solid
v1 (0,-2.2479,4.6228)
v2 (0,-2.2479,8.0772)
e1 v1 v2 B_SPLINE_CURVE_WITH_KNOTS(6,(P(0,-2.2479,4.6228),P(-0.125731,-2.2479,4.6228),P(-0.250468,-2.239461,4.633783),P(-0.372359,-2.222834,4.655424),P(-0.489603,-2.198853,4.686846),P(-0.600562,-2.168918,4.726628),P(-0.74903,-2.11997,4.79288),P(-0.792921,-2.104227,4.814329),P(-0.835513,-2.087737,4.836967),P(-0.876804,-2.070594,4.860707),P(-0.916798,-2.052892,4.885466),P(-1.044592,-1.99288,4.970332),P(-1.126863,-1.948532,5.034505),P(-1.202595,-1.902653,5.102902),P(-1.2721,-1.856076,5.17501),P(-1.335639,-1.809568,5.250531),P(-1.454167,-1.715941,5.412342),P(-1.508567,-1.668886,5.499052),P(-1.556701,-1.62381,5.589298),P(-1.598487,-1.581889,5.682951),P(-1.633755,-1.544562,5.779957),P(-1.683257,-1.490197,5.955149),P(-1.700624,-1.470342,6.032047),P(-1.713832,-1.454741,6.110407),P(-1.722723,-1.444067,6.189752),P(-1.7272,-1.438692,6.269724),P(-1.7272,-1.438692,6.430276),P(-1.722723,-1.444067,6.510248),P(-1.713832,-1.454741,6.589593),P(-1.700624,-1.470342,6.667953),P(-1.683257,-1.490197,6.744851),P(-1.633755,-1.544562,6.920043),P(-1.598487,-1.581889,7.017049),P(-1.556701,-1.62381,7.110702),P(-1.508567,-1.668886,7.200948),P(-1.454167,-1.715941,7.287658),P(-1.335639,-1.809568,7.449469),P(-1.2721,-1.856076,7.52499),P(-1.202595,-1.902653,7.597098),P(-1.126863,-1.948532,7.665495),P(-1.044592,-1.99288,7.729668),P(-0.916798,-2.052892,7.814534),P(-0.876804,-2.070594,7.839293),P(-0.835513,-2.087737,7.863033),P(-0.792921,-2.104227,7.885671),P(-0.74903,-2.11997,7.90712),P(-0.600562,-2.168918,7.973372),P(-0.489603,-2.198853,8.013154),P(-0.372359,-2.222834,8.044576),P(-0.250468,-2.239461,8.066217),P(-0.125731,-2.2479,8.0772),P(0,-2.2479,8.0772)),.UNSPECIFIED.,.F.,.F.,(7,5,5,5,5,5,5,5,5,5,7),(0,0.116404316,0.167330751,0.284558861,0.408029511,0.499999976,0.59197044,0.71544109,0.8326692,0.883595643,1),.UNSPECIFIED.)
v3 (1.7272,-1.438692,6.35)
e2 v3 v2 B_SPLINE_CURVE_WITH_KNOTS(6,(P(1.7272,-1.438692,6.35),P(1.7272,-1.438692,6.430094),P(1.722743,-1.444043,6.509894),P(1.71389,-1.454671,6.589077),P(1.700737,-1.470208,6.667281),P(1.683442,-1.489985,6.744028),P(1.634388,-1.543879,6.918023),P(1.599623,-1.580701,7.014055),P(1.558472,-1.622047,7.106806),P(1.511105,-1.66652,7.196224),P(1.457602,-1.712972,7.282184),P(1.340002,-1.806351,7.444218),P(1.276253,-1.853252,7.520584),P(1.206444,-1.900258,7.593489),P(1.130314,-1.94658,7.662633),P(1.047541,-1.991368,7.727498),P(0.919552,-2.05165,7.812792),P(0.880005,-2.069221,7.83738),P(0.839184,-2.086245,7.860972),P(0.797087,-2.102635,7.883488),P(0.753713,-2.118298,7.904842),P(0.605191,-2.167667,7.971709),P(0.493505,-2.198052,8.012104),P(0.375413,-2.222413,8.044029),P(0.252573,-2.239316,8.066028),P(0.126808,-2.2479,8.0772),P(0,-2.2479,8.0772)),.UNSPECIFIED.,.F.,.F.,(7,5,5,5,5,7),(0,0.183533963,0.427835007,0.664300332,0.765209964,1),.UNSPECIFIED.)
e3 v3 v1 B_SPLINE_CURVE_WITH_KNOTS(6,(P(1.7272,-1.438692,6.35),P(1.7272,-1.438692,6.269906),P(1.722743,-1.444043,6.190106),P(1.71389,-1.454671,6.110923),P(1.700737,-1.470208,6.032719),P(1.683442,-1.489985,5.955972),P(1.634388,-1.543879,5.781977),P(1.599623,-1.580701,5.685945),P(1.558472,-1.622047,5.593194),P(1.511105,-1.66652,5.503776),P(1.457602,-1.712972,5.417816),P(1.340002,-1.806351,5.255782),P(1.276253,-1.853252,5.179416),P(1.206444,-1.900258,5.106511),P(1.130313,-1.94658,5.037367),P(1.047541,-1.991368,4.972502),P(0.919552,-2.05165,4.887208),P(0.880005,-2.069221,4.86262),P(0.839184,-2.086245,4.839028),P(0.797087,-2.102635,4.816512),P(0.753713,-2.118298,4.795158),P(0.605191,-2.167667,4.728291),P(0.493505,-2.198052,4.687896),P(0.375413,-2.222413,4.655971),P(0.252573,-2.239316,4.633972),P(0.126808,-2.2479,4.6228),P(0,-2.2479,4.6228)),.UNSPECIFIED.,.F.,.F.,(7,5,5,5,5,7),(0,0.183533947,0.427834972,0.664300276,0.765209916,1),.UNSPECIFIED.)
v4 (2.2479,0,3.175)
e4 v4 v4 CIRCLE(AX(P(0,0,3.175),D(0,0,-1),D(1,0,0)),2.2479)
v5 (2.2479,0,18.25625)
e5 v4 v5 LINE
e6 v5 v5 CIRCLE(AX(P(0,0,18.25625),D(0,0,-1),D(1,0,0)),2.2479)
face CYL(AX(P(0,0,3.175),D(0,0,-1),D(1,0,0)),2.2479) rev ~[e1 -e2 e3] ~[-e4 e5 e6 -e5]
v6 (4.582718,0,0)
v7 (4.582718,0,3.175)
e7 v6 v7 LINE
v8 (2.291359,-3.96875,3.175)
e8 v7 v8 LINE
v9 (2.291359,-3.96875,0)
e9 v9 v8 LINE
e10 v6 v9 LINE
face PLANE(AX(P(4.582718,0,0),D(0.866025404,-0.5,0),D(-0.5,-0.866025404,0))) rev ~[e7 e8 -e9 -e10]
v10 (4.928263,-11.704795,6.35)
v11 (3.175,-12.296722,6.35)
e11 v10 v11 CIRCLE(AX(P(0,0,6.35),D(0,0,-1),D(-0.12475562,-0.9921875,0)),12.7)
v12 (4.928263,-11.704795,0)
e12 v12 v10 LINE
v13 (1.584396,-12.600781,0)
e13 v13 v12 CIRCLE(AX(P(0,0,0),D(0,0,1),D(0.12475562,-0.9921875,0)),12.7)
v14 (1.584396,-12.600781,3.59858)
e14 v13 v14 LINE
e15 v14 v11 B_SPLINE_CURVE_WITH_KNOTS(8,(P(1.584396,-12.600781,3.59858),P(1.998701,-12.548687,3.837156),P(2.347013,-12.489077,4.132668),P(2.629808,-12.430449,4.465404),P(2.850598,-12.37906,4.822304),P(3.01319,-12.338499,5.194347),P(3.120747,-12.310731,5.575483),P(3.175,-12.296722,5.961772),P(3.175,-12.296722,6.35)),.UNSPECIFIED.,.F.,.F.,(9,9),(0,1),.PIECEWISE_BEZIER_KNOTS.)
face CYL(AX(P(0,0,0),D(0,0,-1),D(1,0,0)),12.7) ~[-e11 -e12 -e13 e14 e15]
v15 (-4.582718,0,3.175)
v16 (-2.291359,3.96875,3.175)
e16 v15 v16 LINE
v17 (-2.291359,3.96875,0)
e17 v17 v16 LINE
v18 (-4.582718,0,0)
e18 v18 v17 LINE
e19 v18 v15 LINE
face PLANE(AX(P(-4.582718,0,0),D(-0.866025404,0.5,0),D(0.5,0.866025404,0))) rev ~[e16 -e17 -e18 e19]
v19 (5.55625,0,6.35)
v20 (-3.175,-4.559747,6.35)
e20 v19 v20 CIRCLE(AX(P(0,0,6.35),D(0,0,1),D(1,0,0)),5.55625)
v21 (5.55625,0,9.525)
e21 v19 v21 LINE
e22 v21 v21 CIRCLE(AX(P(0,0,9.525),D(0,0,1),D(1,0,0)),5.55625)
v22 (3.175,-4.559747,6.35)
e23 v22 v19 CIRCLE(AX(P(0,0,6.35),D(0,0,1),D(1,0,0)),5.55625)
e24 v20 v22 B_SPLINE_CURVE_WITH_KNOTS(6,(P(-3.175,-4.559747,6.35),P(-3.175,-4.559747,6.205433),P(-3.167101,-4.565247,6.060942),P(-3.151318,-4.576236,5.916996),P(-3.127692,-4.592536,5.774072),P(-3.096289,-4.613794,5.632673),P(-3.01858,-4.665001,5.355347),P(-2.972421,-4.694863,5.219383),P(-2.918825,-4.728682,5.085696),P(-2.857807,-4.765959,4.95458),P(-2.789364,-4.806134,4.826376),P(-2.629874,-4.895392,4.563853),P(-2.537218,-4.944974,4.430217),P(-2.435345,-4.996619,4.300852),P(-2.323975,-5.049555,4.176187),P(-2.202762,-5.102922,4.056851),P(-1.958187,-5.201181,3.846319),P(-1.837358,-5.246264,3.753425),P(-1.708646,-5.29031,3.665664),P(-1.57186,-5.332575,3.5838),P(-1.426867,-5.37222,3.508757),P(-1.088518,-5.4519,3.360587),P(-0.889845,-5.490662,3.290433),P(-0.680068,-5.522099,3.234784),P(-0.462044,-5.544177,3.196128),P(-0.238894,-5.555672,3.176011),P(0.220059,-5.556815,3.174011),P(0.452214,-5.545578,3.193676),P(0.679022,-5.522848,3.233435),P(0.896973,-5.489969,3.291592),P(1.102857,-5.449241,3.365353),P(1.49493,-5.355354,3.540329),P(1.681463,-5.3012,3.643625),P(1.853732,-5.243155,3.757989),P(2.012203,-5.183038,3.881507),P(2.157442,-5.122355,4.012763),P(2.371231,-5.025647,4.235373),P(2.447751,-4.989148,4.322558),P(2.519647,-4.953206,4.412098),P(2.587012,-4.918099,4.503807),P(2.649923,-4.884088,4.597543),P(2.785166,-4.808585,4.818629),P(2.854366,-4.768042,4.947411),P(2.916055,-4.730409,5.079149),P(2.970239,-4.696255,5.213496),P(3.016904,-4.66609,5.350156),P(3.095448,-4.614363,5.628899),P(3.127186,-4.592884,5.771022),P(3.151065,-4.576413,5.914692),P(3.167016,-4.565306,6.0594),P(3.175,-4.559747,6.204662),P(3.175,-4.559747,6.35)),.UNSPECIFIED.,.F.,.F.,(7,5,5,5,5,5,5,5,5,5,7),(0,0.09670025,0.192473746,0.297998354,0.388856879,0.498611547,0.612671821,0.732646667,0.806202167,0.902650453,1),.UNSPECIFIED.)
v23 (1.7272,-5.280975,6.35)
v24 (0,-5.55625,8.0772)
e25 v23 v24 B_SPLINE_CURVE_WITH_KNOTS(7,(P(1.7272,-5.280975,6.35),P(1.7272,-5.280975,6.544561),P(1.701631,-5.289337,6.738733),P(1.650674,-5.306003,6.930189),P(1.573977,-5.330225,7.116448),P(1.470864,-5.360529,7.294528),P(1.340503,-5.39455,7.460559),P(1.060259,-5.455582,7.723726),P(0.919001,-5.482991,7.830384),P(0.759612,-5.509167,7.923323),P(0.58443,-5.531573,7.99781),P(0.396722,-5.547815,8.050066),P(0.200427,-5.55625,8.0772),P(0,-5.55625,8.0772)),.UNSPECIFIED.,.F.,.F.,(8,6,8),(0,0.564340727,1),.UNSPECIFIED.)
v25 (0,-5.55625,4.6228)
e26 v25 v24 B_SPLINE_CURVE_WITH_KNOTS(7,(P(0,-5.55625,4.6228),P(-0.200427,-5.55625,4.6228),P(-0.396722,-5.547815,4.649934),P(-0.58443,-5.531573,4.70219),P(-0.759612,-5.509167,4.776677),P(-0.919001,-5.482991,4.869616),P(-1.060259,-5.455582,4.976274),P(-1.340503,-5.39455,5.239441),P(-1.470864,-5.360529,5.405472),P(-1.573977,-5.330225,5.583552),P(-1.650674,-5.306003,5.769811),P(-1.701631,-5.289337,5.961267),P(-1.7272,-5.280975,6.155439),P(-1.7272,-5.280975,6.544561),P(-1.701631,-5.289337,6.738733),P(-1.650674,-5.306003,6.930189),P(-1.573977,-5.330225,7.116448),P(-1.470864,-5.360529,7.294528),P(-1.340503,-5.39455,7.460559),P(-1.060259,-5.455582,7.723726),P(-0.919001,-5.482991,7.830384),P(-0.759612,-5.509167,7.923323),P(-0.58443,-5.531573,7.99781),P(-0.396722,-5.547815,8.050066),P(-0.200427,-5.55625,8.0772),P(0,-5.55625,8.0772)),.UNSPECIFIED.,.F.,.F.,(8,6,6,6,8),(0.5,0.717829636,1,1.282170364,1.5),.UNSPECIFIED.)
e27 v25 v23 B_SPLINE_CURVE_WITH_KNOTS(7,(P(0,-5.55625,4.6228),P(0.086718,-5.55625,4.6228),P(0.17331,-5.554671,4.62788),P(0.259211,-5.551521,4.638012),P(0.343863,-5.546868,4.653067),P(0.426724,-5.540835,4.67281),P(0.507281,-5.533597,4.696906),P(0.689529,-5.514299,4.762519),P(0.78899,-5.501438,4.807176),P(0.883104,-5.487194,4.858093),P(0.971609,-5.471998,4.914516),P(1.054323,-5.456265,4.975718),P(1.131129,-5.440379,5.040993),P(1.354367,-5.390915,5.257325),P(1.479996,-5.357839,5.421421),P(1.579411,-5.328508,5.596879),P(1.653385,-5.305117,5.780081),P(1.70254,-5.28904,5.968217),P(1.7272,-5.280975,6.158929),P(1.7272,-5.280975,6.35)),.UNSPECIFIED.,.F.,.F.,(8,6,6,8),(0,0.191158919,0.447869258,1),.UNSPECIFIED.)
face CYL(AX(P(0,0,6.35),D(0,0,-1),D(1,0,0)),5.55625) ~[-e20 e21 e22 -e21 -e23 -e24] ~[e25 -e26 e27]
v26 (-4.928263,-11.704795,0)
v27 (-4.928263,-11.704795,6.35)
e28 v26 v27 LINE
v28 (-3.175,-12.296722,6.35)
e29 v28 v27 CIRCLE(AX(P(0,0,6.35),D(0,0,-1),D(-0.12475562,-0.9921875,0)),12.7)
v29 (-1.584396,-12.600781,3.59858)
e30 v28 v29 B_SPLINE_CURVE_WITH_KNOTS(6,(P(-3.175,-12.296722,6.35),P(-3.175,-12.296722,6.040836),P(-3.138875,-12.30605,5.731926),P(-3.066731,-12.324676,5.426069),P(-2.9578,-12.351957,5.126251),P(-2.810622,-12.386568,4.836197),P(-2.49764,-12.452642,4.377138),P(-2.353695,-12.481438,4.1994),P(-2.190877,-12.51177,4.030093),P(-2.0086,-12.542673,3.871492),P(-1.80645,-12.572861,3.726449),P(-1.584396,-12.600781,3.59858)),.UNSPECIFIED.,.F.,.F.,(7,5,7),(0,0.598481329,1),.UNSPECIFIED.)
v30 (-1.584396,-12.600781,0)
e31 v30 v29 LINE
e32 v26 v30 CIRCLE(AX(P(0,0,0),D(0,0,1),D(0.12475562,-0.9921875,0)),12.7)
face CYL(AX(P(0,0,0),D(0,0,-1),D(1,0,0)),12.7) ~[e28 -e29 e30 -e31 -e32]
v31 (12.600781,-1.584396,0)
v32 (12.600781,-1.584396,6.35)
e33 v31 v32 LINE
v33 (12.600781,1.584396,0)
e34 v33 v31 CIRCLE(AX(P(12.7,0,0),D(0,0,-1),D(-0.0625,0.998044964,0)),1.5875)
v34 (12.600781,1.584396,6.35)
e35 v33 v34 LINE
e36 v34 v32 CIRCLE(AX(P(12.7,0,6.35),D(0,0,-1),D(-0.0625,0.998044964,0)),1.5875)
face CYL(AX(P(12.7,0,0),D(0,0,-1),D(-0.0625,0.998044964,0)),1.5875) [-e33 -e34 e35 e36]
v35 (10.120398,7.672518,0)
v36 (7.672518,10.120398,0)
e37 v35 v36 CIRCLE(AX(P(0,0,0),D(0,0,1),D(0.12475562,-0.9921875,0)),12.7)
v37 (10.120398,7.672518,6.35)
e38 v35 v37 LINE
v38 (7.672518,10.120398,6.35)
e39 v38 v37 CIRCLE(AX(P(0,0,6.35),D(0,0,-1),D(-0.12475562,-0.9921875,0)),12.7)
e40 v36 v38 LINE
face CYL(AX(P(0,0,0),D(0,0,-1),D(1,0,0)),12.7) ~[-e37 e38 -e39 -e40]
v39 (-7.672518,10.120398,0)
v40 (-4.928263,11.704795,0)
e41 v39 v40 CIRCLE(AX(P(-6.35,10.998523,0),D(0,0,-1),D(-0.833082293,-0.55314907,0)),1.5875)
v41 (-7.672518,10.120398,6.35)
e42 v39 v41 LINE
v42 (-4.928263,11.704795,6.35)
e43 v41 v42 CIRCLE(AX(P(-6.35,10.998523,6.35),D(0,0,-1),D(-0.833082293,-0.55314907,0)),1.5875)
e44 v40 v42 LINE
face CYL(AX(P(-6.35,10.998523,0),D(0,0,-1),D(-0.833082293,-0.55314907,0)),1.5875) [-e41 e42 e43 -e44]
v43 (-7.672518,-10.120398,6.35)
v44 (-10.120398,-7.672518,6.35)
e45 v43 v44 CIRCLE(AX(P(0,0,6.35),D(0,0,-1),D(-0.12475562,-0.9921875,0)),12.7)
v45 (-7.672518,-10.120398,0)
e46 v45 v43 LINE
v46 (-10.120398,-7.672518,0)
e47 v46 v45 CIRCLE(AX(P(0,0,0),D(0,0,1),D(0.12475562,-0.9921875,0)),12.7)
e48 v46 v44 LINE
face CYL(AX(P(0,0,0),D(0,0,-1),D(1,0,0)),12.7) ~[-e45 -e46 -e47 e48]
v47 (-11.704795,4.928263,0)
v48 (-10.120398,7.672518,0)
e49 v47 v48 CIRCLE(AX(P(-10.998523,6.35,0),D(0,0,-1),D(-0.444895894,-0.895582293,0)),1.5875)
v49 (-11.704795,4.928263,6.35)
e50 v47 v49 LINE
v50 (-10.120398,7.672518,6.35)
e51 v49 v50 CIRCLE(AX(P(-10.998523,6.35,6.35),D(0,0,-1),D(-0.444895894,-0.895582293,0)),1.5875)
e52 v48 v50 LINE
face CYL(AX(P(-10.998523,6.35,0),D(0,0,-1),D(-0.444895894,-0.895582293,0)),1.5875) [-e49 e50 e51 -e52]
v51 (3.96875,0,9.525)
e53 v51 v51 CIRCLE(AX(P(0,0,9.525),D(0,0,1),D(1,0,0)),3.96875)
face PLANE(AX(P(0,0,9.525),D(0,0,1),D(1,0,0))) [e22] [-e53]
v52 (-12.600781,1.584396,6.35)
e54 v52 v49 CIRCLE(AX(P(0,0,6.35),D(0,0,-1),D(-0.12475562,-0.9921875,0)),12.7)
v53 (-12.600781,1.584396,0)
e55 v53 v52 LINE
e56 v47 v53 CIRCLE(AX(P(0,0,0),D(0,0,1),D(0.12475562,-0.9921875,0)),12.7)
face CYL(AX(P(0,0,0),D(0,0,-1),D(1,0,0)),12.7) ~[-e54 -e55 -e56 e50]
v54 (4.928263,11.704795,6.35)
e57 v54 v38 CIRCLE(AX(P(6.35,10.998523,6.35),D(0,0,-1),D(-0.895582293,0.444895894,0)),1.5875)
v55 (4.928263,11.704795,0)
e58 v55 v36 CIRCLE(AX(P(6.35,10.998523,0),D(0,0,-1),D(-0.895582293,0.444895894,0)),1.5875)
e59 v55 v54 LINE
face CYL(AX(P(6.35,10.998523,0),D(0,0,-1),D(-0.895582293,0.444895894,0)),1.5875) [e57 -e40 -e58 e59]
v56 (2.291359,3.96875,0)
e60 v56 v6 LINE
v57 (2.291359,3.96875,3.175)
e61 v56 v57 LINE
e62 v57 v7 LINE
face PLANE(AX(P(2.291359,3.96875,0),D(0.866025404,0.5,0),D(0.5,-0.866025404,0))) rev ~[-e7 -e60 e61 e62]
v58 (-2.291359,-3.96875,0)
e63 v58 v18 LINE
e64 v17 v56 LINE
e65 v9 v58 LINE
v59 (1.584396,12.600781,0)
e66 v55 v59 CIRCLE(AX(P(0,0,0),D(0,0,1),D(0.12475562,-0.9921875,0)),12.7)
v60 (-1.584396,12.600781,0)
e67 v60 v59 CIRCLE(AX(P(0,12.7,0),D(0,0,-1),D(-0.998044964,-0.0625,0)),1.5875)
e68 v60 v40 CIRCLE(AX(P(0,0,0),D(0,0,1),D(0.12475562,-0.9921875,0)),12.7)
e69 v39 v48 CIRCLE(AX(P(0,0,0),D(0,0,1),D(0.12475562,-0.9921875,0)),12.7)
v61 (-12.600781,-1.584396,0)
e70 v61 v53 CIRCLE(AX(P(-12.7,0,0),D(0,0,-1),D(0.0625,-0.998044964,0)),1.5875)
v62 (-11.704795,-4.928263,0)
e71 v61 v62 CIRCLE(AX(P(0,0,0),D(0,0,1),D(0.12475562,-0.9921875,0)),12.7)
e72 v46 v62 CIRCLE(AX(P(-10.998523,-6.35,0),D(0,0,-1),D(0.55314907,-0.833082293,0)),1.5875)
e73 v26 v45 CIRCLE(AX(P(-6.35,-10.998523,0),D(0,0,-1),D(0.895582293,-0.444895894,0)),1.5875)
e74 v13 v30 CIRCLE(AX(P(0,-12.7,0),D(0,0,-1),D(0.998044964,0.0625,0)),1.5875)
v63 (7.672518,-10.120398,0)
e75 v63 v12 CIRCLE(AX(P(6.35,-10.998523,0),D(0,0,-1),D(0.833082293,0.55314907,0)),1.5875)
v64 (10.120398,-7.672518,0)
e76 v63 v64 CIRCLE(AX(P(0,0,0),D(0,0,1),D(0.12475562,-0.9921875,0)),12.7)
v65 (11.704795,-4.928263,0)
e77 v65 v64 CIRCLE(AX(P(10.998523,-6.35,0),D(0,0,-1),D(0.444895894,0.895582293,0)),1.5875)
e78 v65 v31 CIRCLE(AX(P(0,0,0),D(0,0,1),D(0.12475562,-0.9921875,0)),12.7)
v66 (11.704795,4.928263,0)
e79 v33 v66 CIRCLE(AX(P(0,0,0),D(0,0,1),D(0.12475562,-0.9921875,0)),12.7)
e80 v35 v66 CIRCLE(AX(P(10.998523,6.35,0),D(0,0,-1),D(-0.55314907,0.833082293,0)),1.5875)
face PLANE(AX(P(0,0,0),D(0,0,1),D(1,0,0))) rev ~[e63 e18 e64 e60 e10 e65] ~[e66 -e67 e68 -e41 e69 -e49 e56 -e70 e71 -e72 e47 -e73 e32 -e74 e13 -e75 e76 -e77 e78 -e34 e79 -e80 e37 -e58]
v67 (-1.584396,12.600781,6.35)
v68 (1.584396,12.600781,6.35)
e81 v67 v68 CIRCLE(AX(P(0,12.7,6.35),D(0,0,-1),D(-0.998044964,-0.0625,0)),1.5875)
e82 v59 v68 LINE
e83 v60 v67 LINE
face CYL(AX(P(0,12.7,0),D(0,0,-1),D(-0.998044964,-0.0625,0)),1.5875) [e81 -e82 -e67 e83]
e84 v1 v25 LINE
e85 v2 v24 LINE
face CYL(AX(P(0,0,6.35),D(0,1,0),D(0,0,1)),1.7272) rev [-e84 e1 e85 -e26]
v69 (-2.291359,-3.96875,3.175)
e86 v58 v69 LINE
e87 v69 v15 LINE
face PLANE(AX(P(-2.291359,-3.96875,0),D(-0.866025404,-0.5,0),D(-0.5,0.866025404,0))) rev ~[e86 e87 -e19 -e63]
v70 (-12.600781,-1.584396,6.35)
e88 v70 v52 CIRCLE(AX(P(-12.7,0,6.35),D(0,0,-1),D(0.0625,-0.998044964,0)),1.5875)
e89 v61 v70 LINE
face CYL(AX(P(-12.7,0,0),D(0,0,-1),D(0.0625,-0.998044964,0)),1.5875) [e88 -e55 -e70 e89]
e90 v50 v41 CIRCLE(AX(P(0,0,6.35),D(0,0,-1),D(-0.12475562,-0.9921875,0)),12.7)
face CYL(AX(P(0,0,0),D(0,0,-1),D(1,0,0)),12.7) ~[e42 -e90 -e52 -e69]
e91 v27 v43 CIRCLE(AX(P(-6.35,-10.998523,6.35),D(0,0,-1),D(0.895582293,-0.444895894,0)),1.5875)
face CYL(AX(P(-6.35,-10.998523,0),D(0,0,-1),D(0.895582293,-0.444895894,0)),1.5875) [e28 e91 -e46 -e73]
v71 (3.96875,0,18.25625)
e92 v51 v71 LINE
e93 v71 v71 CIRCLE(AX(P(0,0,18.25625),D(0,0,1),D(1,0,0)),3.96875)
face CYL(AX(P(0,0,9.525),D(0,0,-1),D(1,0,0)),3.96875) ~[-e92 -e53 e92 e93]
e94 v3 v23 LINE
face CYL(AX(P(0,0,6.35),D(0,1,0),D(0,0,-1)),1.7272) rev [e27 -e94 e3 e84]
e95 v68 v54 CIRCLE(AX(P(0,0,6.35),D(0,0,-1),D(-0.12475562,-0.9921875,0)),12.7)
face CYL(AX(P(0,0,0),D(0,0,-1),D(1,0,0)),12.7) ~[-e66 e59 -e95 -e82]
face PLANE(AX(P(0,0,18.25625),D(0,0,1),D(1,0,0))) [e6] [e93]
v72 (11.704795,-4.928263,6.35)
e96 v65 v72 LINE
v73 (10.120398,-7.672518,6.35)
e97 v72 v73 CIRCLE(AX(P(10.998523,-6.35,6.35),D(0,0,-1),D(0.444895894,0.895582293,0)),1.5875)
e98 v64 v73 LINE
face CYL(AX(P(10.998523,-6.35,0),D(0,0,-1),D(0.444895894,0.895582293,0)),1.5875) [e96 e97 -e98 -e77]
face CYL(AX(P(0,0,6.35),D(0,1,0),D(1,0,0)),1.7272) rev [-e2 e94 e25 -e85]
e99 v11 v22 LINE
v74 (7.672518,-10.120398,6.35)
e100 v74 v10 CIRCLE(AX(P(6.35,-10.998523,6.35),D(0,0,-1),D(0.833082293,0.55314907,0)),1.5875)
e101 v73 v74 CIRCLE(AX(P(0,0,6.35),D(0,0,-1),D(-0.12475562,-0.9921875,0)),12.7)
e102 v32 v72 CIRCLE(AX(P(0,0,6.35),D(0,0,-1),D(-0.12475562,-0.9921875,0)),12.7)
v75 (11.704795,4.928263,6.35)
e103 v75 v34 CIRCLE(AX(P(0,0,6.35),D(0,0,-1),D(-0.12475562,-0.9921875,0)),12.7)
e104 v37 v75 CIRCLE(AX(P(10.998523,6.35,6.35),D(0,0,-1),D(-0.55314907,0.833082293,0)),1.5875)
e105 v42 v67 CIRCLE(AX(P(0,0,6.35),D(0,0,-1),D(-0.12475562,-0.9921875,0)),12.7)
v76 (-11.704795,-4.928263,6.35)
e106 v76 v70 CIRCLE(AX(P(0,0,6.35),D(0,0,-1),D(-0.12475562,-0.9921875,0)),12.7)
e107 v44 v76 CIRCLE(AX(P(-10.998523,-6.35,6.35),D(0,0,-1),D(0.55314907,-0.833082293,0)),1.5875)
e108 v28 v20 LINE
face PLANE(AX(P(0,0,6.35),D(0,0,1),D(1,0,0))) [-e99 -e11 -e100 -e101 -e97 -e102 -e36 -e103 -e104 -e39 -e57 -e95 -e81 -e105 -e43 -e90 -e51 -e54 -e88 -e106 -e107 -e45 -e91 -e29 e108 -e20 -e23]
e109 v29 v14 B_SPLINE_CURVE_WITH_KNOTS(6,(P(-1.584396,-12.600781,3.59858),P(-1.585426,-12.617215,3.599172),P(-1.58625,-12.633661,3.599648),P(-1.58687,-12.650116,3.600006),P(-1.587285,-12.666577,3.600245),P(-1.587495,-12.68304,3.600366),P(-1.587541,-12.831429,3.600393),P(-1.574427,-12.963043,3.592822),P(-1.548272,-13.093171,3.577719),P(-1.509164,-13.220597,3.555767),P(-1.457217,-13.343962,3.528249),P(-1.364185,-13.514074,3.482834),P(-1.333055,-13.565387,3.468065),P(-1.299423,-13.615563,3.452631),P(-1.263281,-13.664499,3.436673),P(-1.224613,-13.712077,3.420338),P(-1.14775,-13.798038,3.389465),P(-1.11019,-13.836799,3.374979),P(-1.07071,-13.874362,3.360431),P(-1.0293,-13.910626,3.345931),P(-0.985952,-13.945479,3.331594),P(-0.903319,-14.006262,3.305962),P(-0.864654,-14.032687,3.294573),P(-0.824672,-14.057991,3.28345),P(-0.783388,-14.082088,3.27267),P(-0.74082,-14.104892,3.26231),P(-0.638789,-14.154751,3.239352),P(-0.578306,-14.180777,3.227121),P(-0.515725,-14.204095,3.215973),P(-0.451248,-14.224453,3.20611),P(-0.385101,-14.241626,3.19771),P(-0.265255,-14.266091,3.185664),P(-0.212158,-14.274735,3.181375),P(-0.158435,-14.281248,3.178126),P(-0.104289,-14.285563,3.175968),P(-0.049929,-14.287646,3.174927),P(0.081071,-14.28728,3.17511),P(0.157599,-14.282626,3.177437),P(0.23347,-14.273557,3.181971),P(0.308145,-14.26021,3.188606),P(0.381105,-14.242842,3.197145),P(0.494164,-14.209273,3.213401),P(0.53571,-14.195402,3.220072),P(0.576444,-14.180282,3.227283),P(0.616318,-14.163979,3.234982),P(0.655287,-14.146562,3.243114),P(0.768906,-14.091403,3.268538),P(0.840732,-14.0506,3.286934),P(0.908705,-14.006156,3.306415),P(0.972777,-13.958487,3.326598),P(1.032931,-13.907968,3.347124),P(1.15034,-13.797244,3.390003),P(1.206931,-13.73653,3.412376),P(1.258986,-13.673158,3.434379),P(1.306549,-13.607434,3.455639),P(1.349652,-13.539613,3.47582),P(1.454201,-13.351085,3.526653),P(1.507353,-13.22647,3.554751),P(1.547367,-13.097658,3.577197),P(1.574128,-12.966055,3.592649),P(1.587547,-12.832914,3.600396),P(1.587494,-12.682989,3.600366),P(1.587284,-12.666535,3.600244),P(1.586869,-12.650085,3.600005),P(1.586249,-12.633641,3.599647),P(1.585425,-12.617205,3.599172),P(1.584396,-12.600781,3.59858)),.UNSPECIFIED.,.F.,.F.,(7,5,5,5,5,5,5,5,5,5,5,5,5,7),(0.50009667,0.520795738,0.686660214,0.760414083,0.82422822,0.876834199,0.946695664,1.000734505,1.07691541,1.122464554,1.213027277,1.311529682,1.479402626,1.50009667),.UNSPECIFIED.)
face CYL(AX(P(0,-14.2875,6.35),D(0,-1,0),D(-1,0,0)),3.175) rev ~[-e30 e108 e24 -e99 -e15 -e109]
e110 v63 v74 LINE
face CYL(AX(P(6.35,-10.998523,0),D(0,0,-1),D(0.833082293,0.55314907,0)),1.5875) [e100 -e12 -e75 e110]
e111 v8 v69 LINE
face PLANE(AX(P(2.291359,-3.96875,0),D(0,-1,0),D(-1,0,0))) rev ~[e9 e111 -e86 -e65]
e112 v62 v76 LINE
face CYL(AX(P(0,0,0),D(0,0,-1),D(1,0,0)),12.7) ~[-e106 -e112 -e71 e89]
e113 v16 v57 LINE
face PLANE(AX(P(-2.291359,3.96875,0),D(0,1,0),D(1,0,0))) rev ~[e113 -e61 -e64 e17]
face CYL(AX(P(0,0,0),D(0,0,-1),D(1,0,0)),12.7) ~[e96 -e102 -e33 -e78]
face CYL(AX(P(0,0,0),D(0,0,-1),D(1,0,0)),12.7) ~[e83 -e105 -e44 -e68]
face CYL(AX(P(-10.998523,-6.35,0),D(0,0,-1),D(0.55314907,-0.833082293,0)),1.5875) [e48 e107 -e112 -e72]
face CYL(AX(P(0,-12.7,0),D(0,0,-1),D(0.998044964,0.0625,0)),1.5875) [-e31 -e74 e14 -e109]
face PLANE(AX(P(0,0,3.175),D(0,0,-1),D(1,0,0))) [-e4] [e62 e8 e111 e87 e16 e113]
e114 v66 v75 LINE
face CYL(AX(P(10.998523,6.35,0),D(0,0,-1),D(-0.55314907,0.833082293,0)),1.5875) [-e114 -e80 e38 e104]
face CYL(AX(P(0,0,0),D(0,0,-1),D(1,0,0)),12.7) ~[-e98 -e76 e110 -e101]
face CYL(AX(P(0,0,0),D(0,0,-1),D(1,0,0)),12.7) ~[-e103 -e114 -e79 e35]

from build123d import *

# Parameters (mm, degrees)
F0_R           = 12.7
F1_DEPTH       = 6.35
F3_DEPTH       = 3.175
F4_R           = 5.55625
F5_DEPTH       = 3.175
F6_R           = 3.96875
F7_DEPTH       = 8.73125
F8_R           = 2.2479
F9_DEPTH       = 15.08125
F11_DEPTH      = 6.35
F12_COUNT      = 12
F12_ANGLE      = 330
F14_END_RADIUS = 5.55625
F14_REACH      = 18.1506366107
F17_END_RADIUS = 5.55625
F17_REACH      = 35.6755158286


with BuildPart() as f1:
    # F0 (on Top) → F1 (new body)
    with BuildSketch(Plane.XY):
        Circle(F0_R)
    extrude(amount=F1_DEPTH)

    # F2 (on face) → F3 (cut)
    with BuildSketch(Plane(origin=(0, 0, 0), x_dir=(1, 0, 0), z_dir=(0, 0, -1))):
        Polygon((2.2913588808, 3.96875), (-2.2913588808, 3.96875), (-4.5827177617, 0), (-2.2913588808, -3.96875), (2.2913588808, -3.96875), (4.5827177617, 0), align=None)
    extrude(amount=-F3_DEPTH, mode=Mode.SUBTRACT)

    # F4 (on face) → F5 (join)
    with BuildSketch(Plane.XY.offset(6.35)):
        Circle(F4_R)
    extrude(amount=F5_DEPTH)

    # F6 (on face) → F7 (join)
    with BuildSketch(Plane.XY.offset(9.525)):
        Circle(F6_R)
    extrude(amount=F7_DEPTH)

    # F8 (on face) → F9 (cut, through all)
    with BuildSketch(Plane(origin=(0, 0, 3.175), x_dir=(1, 0, 0), z_dir=(0, 0, -1))):
        Circle(F8_R)
    extrude(amount=-F9_DEPTH, mode=Mode.SUBTRACT)

    # F10 (on face) → F11 (join, through all)
    with BuildSketch(Plane(origin=(0, 0, 0), x_dir=(1, 0, 0), z_dir=(0, 0, -1))):
        with BuildLine():
            ThreePointArc((-1.5843963802, 12.60078125), (0, 12.7), (1.5843963802, 12.60078125))
            ThreePointArc((1.5843963802, 12.60078125), (0, 14.2875), (-1.5843963802, 12.60078125))
        make_face()
    f11 = extrude(amount=-F11_DEPTH)

    # F12: F11 ×12 about axis
    f12_axis = Axis((0, 0, 0), (0, 0, -1))
    for i in range(1, F12_COUNT):
        add(f11.rotate(f12_axis, i * F12_ANGLE / (F12_COUNT - 1)))

    f14_end = (Plane(origin=(0, 0, 7.9375), x_dir=(-1, 0, 0), z_dir=(0, 0, -1)) * Cylinder(F14_END_RADIUS, 124.9884067655, mode=Mode.PRIVATE)).faces().sort_by_distance((-5.55625, 0, 7.9375))[0]
    # F13 (on Front) → F14 (cut, up to the whole of a round face its end follows)
    with BuildSketch(Plane.XZ):
        with BuildLine():
            ThreePointArc((0, 8.0772), (-1.7272, 6.35), (0, 4.6228))
            Line((0, 4.6228), (0, 8.0772))
        make_face()
        with BuildLine():
            Line((0, 8.0772), (0, 4.6228))
            ThreePointArc((0, 4.6228), (1.2213148325, 5.1286851675), (1.7272, 6.35))
            ThreePointArc((1.7272, 6.35), (1.2213148325, 7.5713148325), (0, 8.0772))
        make_face()
    f14_long = extrude(amount=F14_REACH, mode=Mode.PRIVATE)
    add(split(f14_long, bisect_by=f14_end, keep=Keep.BOTTOM, mode=Mode.PRIVATE), mode=Mode.SUBTRACT)

    f17_end = (Plane(origin=(0, 0, 7.9375), x_dir=(-1, 0, 0), z_dir=(0, 0, -1)) * Cylinder(F17_END_RADIUS, 160.0381652835, mode=Mode.PRIVATE)).faces().sort_by_distance((-5.55625, 0, 7.9375))[0]
    # F16 (on offset) → F17 (cut, up to the whole of a round face its end follows)
    with BuildSketch(Plane.XZ.offset(14.2875)):
        with BuildLine():
            Line((3.175, 6.35), (-3.175, 6.35))
            ThreePointArc((-3.175, 6.35), (0, 3.175), (3.175, 6.35))
        make_face()
    f17_long = extrude(amount=-F17_REACH, mode=Mode.PRIVATE)
    add(split(f17_long, bisect_by=f17_end, keep=Keep.ALL, mode=Mode.PRIVATE).solids().sort_by_distance((0, -14.2875, 5.0024881485))[0], mode=Mode.SUBTRACT)


solid = f1.part
